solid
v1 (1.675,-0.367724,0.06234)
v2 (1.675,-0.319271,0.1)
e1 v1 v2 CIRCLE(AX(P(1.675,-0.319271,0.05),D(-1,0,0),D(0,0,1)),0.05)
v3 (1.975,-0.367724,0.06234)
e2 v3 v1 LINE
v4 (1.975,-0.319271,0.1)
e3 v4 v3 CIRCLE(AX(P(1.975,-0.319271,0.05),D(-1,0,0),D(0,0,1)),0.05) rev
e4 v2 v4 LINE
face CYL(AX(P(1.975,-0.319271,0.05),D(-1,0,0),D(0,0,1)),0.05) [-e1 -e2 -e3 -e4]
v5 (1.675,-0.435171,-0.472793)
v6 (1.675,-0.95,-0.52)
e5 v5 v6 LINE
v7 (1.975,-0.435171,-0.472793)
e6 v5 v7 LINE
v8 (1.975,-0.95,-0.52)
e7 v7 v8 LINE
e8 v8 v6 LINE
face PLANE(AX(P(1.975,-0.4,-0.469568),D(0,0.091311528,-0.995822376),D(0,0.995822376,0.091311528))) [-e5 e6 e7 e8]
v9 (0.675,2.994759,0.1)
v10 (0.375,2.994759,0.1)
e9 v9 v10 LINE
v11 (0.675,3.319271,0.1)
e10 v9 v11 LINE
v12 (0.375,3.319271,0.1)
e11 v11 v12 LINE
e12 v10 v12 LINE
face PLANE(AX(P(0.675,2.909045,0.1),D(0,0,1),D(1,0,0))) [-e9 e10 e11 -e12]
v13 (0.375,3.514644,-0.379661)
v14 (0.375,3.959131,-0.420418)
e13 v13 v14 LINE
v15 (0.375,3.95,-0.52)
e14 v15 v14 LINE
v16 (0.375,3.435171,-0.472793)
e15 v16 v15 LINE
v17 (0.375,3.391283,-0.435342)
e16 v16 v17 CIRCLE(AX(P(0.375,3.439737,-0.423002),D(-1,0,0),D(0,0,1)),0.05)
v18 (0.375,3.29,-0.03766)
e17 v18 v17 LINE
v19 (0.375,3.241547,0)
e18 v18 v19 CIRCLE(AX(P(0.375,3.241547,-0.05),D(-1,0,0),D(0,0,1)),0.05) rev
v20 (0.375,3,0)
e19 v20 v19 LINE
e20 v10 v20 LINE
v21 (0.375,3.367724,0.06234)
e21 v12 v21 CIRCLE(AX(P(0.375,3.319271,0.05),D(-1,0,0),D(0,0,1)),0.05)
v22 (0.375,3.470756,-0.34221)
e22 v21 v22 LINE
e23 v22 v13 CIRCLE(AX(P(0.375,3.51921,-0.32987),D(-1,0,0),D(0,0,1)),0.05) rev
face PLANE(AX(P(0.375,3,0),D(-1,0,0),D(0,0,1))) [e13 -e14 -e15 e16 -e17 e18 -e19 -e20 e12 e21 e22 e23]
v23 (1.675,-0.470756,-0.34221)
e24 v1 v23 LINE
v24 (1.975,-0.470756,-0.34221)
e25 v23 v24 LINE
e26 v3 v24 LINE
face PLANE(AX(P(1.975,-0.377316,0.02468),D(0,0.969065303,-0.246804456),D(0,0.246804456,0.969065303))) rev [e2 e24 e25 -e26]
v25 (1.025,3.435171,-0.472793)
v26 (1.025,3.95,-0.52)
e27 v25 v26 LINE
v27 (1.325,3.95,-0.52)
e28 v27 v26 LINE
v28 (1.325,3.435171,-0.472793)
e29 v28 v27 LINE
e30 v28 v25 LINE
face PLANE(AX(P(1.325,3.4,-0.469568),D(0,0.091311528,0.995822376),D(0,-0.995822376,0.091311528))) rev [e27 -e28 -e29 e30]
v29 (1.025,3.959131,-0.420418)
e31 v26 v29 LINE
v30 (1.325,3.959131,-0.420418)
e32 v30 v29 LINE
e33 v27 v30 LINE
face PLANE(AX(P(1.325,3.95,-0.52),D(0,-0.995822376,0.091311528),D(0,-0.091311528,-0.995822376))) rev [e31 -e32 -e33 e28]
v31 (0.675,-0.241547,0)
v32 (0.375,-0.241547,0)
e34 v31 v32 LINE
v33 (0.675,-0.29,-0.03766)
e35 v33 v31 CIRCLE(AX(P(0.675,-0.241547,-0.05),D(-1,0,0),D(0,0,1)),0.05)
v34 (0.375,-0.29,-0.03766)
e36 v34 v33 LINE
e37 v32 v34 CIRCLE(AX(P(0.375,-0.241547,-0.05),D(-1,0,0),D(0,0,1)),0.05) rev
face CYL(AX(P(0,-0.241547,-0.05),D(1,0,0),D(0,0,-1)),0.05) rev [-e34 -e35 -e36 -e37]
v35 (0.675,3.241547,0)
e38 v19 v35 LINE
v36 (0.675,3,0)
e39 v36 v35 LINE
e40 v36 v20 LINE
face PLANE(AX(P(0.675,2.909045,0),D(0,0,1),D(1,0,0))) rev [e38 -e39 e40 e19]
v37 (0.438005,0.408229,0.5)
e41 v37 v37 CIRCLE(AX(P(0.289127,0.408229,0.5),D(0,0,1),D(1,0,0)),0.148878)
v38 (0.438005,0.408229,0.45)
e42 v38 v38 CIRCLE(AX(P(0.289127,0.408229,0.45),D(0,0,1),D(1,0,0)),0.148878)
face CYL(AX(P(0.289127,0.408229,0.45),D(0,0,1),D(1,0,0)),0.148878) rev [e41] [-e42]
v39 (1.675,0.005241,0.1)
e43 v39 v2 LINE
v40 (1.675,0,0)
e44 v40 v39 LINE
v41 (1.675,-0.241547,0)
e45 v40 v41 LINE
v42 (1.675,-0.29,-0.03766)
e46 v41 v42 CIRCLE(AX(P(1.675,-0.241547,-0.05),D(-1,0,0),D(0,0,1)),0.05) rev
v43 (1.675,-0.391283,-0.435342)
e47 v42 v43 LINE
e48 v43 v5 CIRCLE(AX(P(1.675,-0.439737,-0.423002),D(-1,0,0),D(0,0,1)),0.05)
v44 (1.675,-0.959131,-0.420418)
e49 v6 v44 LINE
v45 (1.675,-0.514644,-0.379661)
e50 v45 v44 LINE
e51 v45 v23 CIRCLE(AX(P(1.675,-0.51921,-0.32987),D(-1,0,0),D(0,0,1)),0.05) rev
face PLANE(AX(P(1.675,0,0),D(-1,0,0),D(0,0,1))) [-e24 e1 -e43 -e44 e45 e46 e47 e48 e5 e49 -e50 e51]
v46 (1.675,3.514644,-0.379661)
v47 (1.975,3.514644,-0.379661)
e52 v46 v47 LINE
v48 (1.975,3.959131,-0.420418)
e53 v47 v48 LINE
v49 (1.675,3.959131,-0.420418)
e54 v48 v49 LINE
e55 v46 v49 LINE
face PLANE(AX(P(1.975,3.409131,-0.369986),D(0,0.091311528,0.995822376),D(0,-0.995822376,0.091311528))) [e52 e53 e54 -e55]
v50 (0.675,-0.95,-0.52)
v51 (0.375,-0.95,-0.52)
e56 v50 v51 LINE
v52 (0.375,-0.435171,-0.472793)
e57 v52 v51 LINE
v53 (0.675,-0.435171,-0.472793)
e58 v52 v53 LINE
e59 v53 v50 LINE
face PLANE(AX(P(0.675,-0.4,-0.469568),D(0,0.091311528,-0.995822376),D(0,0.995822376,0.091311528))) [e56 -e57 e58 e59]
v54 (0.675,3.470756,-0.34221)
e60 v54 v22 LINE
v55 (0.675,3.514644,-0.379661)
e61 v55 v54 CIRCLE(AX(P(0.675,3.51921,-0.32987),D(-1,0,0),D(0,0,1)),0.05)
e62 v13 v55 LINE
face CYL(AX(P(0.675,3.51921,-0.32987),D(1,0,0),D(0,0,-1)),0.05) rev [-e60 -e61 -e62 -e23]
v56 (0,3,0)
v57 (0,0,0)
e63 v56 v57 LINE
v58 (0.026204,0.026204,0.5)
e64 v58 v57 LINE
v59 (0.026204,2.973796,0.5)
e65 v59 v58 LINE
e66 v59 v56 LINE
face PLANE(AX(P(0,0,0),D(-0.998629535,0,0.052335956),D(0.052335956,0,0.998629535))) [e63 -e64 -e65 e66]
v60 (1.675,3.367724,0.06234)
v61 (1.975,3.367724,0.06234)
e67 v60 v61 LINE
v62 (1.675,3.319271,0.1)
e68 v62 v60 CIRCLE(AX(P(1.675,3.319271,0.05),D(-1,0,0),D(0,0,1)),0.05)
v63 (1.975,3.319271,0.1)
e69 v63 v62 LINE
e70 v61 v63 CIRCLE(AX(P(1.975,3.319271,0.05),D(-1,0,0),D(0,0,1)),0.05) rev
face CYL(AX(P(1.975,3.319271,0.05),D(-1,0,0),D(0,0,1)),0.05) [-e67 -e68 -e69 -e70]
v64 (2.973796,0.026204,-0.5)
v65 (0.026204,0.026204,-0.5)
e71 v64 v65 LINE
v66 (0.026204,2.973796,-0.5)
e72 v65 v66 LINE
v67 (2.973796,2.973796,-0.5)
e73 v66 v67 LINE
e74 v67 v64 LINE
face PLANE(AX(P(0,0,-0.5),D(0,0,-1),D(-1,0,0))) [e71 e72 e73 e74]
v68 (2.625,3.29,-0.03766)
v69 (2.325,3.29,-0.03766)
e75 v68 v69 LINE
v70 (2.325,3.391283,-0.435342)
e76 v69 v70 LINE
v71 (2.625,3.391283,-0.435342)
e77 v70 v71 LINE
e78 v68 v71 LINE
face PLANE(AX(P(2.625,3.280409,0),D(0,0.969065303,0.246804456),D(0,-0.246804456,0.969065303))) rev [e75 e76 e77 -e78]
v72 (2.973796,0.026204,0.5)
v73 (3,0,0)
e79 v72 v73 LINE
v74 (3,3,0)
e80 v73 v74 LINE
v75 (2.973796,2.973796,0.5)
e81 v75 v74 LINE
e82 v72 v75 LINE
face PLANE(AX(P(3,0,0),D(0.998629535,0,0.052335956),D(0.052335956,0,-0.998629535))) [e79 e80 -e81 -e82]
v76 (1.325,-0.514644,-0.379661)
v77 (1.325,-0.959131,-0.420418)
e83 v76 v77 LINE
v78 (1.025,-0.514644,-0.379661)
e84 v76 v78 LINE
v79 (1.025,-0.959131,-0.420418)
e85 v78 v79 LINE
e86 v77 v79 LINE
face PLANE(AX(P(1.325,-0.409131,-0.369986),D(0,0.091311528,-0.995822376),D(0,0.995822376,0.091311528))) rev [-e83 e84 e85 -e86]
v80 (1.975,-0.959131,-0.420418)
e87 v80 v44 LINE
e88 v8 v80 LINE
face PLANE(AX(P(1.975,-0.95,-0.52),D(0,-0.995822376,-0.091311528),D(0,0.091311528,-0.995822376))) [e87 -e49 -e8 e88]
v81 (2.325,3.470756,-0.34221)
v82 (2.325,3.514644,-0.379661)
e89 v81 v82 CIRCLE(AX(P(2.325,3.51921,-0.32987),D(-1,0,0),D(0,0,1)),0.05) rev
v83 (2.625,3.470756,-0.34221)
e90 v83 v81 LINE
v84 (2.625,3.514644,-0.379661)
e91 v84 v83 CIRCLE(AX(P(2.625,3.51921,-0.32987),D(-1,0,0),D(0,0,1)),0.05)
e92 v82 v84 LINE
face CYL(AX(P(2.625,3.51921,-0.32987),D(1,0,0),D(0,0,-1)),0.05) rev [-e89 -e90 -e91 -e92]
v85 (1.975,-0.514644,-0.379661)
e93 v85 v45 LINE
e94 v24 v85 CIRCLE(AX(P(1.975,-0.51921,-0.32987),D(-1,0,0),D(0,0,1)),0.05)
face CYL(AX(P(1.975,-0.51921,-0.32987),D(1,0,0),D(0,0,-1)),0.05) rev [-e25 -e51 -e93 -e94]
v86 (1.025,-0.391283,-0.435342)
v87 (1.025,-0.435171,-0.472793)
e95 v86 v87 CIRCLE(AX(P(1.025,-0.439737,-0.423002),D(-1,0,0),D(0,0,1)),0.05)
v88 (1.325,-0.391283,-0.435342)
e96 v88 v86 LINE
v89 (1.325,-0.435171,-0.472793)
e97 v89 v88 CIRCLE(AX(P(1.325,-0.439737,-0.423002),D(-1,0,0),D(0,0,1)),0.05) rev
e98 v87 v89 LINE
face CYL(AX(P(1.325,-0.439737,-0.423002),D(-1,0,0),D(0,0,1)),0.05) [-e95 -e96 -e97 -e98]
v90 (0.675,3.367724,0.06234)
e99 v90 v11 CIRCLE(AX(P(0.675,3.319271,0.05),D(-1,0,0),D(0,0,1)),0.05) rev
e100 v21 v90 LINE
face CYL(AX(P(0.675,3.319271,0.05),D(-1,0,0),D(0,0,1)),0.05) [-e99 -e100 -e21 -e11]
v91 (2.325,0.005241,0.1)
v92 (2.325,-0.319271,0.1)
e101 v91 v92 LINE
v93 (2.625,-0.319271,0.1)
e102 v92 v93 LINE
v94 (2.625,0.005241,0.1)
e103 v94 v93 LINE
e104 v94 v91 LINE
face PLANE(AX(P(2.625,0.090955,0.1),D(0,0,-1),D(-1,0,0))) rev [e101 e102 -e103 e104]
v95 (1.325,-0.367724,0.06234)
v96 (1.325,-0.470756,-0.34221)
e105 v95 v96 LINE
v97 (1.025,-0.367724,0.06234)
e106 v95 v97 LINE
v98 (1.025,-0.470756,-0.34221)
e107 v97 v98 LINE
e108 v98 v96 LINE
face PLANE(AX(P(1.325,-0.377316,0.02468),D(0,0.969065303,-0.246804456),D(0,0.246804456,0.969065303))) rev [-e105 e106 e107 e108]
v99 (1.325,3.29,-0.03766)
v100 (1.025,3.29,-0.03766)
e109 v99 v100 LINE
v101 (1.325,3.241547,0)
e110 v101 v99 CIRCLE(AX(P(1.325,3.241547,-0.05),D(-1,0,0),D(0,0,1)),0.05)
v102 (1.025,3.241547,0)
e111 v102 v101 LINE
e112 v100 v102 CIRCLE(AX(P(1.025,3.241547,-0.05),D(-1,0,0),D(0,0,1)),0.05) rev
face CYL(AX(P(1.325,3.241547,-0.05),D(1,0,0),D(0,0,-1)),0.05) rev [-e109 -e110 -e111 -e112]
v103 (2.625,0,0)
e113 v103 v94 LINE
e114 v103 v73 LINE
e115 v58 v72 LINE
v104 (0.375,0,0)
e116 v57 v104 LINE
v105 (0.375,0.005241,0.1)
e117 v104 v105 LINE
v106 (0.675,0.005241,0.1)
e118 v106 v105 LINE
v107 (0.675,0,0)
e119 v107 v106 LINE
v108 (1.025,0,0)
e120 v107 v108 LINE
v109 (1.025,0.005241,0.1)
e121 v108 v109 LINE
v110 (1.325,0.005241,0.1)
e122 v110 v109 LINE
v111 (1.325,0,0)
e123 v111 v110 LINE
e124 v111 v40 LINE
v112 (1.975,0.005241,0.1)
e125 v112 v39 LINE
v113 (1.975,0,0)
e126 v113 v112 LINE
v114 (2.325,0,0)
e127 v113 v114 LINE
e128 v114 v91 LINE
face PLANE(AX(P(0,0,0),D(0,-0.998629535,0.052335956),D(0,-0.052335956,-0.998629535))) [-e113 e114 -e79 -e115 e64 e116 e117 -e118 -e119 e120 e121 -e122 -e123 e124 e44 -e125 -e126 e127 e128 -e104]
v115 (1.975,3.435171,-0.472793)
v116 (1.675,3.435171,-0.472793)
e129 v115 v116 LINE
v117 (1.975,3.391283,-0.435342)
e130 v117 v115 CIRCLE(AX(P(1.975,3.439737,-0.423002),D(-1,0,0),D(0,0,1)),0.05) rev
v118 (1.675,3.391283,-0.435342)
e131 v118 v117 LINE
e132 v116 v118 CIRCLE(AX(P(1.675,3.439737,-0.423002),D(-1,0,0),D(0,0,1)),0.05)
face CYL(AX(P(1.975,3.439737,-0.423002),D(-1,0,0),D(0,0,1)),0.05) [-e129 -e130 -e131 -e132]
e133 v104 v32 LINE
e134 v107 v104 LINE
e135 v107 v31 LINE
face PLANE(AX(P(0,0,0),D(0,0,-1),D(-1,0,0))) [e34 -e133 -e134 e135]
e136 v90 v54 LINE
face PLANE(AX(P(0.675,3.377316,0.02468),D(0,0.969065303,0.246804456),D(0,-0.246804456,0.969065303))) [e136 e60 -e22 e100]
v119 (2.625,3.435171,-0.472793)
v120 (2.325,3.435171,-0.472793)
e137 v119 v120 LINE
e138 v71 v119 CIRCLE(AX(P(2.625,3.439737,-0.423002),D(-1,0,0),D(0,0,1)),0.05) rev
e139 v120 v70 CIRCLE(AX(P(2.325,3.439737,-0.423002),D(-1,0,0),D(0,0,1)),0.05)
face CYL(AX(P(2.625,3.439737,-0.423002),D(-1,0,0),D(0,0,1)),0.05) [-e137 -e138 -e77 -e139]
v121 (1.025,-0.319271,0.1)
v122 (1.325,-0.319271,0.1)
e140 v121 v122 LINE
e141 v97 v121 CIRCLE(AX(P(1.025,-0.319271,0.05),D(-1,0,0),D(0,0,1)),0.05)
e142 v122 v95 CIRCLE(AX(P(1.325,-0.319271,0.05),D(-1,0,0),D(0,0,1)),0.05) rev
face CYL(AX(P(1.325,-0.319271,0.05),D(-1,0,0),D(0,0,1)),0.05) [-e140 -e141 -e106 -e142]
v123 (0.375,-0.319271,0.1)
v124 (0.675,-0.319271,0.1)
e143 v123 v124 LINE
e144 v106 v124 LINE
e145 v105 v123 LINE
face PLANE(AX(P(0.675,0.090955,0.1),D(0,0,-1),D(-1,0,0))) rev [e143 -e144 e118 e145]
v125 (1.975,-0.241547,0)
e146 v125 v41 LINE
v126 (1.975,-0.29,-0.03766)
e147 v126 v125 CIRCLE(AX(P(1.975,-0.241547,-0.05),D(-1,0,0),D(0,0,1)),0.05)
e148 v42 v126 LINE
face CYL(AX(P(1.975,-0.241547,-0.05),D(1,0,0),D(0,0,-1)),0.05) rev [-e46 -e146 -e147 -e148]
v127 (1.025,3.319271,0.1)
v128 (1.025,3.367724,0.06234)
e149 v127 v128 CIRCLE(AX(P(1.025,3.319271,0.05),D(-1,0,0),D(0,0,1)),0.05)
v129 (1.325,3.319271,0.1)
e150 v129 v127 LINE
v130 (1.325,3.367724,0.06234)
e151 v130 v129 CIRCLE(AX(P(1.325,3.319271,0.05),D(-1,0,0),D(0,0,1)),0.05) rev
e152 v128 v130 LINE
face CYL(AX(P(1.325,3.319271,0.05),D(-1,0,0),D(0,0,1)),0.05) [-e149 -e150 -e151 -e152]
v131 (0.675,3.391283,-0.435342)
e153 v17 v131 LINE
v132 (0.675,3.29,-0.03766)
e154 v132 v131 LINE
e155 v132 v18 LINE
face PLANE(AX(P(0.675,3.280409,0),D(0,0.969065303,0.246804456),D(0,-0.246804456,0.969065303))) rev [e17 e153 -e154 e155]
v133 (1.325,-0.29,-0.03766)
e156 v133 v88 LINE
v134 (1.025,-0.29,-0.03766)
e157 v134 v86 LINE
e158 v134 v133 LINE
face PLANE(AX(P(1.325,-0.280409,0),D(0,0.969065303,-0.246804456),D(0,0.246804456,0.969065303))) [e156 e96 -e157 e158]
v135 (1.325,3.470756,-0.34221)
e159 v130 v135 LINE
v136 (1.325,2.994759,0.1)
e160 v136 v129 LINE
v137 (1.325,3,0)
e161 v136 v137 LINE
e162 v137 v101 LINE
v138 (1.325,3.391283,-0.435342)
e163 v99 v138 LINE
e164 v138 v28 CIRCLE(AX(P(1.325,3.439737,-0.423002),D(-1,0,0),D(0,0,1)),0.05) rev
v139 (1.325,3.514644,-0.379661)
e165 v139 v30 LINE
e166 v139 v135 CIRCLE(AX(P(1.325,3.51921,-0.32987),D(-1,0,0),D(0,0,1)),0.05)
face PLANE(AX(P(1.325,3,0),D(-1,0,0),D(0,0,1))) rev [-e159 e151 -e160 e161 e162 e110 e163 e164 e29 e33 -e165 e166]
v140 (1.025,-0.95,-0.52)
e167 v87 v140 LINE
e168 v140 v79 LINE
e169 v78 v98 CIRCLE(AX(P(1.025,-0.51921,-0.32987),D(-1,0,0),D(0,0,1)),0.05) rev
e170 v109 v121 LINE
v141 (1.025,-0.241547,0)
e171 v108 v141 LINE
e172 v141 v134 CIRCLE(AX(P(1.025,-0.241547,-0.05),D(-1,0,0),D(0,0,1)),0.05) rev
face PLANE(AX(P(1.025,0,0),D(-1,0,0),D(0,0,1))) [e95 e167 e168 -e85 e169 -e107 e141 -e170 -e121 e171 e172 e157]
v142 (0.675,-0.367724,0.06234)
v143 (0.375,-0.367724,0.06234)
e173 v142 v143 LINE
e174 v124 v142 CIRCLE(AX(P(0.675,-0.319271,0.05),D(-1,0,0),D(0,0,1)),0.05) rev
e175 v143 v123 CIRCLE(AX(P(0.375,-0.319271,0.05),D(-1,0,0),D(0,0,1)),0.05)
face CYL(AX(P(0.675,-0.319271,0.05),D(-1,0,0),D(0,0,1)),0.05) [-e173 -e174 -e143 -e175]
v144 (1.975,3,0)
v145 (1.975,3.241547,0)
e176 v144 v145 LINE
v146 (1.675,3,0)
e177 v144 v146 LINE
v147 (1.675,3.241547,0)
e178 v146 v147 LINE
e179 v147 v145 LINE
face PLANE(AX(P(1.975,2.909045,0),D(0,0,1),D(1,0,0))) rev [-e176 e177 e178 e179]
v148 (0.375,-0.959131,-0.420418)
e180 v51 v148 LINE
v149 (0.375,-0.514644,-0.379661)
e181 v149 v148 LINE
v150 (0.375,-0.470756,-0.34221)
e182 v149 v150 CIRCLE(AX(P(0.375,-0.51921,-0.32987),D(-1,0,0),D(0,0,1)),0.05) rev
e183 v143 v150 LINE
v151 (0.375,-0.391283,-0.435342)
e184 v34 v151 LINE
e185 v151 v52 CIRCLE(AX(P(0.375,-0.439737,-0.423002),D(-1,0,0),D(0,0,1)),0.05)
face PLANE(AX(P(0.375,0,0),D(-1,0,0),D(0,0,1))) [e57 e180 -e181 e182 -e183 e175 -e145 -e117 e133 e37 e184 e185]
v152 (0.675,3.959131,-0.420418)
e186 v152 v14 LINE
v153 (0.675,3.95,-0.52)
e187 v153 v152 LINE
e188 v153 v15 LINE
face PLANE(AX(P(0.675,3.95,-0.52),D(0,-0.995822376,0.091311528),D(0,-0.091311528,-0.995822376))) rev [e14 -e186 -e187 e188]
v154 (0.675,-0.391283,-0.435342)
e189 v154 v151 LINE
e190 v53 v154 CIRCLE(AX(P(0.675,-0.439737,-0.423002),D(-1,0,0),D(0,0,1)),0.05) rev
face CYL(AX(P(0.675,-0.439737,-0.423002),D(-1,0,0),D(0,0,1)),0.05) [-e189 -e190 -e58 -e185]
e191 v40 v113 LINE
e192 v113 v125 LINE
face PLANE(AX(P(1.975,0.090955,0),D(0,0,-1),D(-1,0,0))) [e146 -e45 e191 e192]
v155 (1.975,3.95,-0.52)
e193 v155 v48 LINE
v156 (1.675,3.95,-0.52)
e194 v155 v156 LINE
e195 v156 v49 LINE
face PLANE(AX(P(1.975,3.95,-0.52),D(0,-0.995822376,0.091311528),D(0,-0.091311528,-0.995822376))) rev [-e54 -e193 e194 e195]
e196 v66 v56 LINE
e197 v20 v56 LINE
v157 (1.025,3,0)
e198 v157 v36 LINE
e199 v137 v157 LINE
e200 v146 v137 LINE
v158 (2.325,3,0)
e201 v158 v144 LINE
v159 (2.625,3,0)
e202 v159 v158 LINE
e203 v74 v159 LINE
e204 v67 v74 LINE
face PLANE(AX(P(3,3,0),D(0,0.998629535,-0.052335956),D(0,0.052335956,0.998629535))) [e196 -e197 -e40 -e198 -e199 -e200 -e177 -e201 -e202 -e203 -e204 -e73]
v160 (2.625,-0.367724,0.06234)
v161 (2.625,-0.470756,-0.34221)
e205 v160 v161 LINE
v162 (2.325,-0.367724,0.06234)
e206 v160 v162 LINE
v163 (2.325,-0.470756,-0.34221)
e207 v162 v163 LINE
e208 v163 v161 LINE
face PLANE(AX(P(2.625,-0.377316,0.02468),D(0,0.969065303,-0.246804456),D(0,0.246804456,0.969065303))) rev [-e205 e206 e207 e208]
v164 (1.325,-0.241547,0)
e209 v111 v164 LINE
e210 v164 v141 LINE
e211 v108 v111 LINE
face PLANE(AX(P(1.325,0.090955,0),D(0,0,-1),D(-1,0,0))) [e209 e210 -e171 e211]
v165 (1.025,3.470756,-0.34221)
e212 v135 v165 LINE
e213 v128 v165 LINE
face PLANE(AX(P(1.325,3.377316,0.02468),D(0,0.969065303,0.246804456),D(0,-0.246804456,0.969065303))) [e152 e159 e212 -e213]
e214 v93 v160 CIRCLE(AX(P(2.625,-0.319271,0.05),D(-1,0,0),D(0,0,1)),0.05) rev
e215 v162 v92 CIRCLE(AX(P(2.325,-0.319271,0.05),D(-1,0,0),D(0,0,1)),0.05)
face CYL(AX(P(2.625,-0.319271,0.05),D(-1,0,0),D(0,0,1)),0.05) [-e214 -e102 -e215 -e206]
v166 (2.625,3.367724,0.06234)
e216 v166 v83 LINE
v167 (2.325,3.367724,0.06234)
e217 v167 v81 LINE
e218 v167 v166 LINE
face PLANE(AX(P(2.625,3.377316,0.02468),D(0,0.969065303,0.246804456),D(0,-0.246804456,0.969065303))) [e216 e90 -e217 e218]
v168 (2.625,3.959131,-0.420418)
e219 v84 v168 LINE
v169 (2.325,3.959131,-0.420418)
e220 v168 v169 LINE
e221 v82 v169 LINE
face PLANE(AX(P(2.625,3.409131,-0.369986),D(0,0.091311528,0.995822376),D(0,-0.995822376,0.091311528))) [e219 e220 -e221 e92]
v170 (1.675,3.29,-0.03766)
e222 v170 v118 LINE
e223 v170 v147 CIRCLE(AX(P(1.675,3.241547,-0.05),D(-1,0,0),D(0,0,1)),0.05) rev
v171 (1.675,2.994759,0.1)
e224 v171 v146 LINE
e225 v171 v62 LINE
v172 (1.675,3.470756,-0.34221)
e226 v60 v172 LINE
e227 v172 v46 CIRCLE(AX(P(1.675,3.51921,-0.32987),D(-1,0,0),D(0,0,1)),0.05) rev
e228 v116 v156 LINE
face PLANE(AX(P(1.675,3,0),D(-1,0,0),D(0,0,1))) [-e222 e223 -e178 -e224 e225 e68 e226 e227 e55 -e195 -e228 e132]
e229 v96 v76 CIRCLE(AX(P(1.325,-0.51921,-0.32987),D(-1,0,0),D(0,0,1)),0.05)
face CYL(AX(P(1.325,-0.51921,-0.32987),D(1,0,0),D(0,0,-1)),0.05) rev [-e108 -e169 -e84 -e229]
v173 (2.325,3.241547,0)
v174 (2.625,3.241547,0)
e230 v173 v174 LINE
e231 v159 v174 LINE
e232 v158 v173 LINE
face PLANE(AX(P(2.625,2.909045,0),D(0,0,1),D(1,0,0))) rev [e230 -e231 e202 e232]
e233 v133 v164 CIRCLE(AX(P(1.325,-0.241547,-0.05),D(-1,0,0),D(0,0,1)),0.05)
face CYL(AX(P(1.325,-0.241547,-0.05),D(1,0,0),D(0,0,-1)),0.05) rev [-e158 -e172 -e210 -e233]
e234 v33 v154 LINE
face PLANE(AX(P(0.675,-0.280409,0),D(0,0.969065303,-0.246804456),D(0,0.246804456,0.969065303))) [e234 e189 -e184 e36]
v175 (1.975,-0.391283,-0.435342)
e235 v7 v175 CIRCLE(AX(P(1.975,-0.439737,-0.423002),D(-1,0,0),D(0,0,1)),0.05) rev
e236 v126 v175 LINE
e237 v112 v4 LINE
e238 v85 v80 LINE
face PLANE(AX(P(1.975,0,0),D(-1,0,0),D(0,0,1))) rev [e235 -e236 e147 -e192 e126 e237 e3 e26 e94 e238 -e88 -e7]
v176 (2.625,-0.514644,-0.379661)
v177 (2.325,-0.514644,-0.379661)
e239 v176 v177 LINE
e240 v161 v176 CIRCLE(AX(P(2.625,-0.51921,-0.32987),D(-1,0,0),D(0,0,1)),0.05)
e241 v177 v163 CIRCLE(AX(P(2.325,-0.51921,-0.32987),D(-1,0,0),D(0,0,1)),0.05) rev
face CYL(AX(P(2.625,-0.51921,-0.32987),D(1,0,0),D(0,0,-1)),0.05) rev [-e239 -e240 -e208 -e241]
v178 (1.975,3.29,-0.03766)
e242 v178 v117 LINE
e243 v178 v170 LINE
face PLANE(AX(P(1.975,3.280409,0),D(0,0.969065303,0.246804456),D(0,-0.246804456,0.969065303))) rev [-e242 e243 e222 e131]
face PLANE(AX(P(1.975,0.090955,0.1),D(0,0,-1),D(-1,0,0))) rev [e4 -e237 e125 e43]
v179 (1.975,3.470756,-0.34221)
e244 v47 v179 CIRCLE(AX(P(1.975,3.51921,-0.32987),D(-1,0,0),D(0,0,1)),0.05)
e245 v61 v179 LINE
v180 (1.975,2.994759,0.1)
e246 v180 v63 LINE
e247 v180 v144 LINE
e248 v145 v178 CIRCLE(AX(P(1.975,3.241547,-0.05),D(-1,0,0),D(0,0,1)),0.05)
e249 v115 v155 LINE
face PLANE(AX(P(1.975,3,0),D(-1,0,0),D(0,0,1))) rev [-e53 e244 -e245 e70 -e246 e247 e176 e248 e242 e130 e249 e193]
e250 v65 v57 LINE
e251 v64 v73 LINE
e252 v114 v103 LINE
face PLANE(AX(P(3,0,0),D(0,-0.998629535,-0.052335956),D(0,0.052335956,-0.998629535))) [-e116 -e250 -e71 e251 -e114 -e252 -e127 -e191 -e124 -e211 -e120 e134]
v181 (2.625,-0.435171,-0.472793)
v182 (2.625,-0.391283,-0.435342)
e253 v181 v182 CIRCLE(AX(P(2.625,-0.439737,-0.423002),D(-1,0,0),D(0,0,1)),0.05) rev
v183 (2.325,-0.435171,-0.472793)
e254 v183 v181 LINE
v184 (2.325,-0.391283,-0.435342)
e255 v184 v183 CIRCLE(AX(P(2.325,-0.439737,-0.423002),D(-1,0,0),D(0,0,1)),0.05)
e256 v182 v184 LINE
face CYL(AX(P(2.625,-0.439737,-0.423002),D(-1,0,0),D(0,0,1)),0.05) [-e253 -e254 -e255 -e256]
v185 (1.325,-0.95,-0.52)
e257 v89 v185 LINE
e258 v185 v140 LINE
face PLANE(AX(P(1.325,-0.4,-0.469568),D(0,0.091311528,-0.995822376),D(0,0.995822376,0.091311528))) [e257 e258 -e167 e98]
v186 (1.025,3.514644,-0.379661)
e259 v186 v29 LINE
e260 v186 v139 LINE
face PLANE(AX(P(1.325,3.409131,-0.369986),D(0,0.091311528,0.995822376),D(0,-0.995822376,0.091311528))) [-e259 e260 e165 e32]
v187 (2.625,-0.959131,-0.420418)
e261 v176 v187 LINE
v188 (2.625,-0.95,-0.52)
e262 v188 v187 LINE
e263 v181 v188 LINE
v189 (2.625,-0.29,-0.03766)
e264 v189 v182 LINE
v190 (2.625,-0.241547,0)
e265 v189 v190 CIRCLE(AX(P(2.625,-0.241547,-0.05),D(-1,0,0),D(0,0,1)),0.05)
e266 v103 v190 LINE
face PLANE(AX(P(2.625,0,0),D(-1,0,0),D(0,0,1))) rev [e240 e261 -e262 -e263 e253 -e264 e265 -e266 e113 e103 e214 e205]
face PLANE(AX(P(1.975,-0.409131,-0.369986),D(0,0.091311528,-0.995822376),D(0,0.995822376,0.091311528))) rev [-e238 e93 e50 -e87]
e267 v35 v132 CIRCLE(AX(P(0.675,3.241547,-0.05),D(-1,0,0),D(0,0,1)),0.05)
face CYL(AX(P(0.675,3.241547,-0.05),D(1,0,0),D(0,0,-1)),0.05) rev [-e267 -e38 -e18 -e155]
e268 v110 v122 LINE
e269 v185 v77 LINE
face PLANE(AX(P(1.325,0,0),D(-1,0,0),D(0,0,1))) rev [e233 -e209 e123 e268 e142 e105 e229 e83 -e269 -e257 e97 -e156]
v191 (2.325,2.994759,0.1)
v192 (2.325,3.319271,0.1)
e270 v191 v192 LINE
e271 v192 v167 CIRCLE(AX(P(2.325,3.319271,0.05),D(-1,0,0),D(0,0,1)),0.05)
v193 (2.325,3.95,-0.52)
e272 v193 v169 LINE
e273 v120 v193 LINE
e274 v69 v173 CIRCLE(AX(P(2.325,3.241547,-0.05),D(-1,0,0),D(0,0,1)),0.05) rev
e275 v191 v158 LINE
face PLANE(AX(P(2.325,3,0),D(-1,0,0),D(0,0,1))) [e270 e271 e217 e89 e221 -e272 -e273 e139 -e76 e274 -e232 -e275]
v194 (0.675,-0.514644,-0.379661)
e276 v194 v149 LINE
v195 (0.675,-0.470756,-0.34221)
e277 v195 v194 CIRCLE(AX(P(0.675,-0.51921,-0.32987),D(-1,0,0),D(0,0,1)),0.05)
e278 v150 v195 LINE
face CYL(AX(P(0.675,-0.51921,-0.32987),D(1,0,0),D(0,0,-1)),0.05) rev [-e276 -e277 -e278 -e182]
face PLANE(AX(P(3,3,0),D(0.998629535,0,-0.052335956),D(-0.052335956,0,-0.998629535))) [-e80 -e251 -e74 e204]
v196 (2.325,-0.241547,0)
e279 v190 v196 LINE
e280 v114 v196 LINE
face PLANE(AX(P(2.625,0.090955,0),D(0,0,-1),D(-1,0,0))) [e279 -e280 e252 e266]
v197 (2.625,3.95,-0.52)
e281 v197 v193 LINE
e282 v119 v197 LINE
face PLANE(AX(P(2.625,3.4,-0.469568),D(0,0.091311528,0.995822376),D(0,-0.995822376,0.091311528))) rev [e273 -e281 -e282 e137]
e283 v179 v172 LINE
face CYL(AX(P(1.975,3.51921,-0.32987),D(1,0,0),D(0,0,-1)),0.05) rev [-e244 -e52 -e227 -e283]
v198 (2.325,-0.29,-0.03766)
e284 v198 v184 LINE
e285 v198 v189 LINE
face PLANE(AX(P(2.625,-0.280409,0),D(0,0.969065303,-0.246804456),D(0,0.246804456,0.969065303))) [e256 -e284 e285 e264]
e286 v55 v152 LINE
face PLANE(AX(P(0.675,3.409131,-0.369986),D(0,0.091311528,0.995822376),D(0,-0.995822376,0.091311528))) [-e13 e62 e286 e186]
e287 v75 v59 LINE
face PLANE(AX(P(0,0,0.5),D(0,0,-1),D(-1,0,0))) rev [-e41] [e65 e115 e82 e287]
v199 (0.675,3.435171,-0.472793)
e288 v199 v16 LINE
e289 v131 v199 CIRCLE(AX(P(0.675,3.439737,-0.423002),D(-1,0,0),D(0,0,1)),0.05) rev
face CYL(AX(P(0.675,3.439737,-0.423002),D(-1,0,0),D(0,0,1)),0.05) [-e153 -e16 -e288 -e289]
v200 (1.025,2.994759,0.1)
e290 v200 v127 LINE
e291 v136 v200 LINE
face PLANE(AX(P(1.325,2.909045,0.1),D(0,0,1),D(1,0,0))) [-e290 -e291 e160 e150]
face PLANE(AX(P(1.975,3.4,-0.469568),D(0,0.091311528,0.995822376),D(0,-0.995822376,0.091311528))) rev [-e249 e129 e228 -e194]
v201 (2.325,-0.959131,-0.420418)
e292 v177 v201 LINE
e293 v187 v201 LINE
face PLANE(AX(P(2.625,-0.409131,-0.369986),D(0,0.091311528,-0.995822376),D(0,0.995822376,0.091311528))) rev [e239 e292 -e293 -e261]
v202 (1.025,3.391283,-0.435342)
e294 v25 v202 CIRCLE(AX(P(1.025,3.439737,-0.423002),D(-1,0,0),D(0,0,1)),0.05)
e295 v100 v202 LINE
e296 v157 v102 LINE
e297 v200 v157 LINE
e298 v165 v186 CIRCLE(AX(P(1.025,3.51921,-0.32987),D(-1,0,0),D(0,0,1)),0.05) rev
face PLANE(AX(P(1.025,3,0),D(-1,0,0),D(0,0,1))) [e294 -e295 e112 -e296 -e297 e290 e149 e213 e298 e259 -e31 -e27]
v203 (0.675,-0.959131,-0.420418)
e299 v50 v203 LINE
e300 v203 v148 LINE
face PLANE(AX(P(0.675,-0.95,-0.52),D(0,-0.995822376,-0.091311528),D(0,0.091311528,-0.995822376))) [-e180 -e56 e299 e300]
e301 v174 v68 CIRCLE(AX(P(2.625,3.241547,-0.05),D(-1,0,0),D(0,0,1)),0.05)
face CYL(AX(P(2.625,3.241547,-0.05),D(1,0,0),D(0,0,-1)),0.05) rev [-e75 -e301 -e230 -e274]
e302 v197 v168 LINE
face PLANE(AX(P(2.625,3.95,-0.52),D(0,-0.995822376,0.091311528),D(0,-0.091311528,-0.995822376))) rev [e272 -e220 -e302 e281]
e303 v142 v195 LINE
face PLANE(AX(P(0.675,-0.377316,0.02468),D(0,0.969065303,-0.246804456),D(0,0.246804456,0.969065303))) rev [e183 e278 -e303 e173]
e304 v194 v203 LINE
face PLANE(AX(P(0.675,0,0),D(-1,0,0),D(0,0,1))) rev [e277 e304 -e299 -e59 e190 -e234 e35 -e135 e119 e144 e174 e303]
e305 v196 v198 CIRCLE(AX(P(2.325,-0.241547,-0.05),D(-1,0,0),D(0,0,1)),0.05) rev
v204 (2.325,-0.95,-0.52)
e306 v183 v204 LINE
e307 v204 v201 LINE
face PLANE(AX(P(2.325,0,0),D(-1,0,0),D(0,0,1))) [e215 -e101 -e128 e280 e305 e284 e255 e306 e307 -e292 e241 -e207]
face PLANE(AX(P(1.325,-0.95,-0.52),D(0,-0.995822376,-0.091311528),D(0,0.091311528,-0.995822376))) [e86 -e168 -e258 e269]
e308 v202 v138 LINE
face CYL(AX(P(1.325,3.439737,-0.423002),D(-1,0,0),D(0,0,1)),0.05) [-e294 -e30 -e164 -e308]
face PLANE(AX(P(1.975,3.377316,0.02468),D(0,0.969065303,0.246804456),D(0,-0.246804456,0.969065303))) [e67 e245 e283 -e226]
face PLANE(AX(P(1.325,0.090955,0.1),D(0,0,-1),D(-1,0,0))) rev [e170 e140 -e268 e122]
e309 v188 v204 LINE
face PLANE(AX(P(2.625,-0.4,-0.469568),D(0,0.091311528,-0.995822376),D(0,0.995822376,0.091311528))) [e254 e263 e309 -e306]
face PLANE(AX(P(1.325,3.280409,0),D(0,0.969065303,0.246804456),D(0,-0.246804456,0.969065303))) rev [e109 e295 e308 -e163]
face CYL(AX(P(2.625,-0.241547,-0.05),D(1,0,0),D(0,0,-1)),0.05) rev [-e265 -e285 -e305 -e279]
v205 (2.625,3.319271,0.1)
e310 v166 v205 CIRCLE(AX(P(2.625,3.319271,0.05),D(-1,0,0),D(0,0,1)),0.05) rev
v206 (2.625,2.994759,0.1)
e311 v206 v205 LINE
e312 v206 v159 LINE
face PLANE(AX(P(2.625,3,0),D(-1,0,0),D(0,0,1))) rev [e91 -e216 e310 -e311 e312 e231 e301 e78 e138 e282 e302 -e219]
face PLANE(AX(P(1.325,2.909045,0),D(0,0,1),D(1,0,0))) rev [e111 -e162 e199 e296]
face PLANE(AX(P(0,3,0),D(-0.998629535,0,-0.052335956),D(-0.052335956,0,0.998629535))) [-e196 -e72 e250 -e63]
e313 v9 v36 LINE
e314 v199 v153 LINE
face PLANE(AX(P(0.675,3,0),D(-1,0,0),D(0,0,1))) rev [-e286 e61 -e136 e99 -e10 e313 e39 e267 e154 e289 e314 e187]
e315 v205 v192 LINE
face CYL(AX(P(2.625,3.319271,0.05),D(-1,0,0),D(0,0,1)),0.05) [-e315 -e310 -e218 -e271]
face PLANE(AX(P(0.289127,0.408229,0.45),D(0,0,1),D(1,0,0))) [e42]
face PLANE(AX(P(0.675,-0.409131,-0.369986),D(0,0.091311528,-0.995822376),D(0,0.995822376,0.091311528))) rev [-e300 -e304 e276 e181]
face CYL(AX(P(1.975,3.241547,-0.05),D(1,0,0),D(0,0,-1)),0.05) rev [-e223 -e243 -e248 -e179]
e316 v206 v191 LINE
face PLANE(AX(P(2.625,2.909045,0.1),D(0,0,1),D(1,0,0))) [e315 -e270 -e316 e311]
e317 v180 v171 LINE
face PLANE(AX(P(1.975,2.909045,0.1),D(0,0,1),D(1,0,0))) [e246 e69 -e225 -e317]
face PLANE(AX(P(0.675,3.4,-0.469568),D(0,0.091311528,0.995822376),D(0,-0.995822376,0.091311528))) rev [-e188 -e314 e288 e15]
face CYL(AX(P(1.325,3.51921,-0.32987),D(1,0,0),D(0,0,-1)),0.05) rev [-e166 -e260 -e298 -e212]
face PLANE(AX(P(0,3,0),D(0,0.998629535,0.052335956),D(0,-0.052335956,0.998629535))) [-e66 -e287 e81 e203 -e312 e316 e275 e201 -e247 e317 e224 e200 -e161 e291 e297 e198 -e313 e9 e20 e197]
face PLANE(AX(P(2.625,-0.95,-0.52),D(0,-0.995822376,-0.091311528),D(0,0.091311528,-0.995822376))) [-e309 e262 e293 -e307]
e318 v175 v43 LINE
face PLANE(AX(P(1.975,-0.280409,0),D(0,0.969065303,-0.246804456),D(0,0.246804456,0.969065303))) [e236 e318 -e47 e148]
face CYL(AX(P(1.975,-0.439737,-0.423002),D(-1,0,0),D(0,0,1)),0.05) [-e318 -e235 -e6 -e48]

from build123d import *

# Parameters (mm, degrees)
SKETCH1_W              = 3
SKETCH1_H              = 3
BOSS_EXTRUDE1_DEPTH    = 0.5
BOSS_EXTRUDE1_TAPER    = 3
SKETCH2_W              = 3
SKETCH2_H              = 3
BOSS_EXTRUDE2_DEPTH    = 0.5
BOSS_EXTRUDE2_TAPER    = 3
EXTRUDE_THIN1_DEPTH    = 0.15
FILLET1_R              = 0.05
LPATTERN1_COUNT        = 4
LPATTERN1_PITCH        = 0.65
FILLET1_OF_LPATTERN1_R = 0.05
MIRROR1_START          = 0.375
MIRROR1_DEPTH          = 0.3
MIRROR1_START_2        = 1.025
MIRROR1_2_DEPTH        = 0.3
MIRROR1_START_3        = 1.675
MIRROR1_3_DEPTH        = 0.3
MIRROR1_START_4        = 2.325
MIRROR1_4_DEPTH        = 0.3
SKETCH4_R              = 0.14887785
CUT_EXTRUDE1_DEPTH     = 0.05


# Read off the part's stored shape, not the designer's step: Mirror1
with BuildPart() as part:
    # Sketch1 → Boss-Extrude1 (new body)
    with BuildSketch(Plane.XY):
        with Locations((1.5, 1.5)):
            Rectangle(SKETCH1_W, SKETCH1_H)
    extrude(amount=BOSS_EXTRUDE1_DEPTH, taper=BOSS_EXTRUDE1_TAPER)



with BuildPart() as body_2:
    # Sketch2 → Boss-Extrude2 (new body)
    with BuildSketch(Plane(origin=(0, 0, 0), x_dir=(-1, 0, 0), z_dir=(0, 0, -1))):
        with Locations((-1.5, 1.5)):
            Rectangle(SKETCH2_W, SKETCH2_H)
    extrude(amount=BOSS_EXTRUDE2_DEPTH, taper=BOSS_EXTRUDE2_TAPER)


with BuildPart() as part_1:
    add(part.part)

    add(body_2.part)  # Extrude-Thin1 merges body 2
    # Sketch3 → Extrude-Thin1 (add, symmetric)
    with BuildSketch(Plane(origin=(0.525, 0, 0), x_dir=(0, 0, -1), z_dir=(1, 0, 0))):
        Polygon((0, 0.090955067), (0, -0.280409021), (0.469567974, -0.4), (0.52, -0.95), (0.420417762, -0.959131153), (0.376435704, -0.479473015), (-0.1, -0.358132942), (-0.1, 0.090955067), align=None)
    extrude_thin1 = extrude(amount=EXTRUDE_THIN1_DEPTH, both=True)

    # Fillet1
    fillet1_edges = [part_1.edges().sort_by_distance(p)[0] for p in [
        (0.525, -0.280409021, 0),
        (0.525, -0.479473015, -0.376435704),
        (0.525, -0.4, -0.469567974),
        (0.525, -0.358132942, 0.1),
    ]]
    fillet(fillet1_edges, radius=FILLET1_R)

    # LPattern1: Extrude-Thin1 ×4
    with Locations(*[(i * LPATTERN1_PITCH, 0, 0) for i in range(1, LPATTERN1_COUNT)]):
        add(extrude_thin1)

    # Fillet1 of LPattern1
    fillet1_of_lpattern1_edges = [part_1.edges().sort_by_distance(p)[0] for p in [
        (1.175, -0.280409021, 0),
        (1.175, -0.479473015, -0.376435704),
        (1.175, -0.4, -0.469567974),
        (1.175, -0.358132942, 0.1),
        (1.825, -0.280409021, 0),
        (1.825, -0.479473015, -0.376435704),
        (1.825, -0.4, -0.469567974),
        (1.825, -0.358132942, 0.1),
        (2.475, -0.280409021, 0),
        (2.475, -0.479473015, -0.376435704),
        (2.475, -0.4, -0.469567974),
        (2.475, -0.358132942, 0.1),
    ]]
    fillet(fillet1_of_lpattern1_edges, radius=FILLET1_OF_LPATTERN1_R)

    # Mirror1 outline → Mirror1 (add)
    with BuildSketch(Plane.YZ.offset(MIRROR1_START)):
        with BuildLine():
            Line((3, 0), (3.241547061, 0))
            ThreePointArc((3.241547061, 0), (3.272230842, -0.010522088), (3.290000326, -0.037659777))
            Line((3.290000326, -0.037659777), (3.391283242, -0.435342062))
            ThreePointArc((3.391283242, -0.435342062), (3.40728051, -0.461036142), (3.435170931, -0.472792958))
            Line((3.435170931, -0.472792958), (3.95, -0.52))
            Line((3.95, -0.52), (3.959131153, -0.420417762))
            Line((3.959131153, -0.420417762), (3.514643946, -0.379660689))
            ThreePointArc((3.514643946, -0.379660689), (3.486753524, -0.367903873), (3.470756257, -0.342209793))
            Line((3.470756257, -0.342209793), (3.367724246, 0.062340223))
            ThreePointArc((3.367724246, 0.062340223), (3.349954762, 0.089477913), (3.319270981, 0.1))
            Line((3.319270981, 0.1), (2.994759222, 0.1))
            Line((2.994759222, 0.1), (3, 0))
        make_face()
    extrude(amount=MIRROR1_DEPTH)

    # Mirror1 2 outline → Mirror1 2 (add)
    with BuildSketch(Plane.YZ.offset(MIRROR1_START_2)):
        with BuildLine():
            Line((3, 0), (3.241547061, 0))
            ThreePointArc((3.241547061, 0), (3.272230842, -0.010522088), (3.290000326, -0.037659777))
            Line((3.290000326, -0.037659777), (3.391283242, -0.435342062))
            ThreePointArc((3.391283242, -0.435342062), (3.40728051, -0.461036142), (3.435170931, -0.472792958))
            Line((3.435170931, -0.472792958), (3.95, -0.52))
            Line((3.95, -0.52), (3.959131153, -0.420417762))
            Line((3.959131153, -0.420417762), (3.514643946, -0.379660689))
            ThreePointArc((3.514643946, -0.379660689), (3.486753524, -0.367903873), (3.470756257, -0.342209793))
            Line((3.470756257, -0.342209793), (3.367724246, 0.062340223))
            ThreePointArc((3.367724246, 0.062340223), (3.349954762, 0.089477913), (3.319270981, 0.1))
            Line((3.319270981, 0.1), (2.994759222, 0.1))
            Line((2.994759222, 0.1), (3, 0))
        make_face()
    extrude(amount=MIRROR1_2_DEPTH)

    # Mirror1 3 outline → Mirror1 3 (add)
    with BuildSketch(Plane.YZ.offset(MIRROR1_START_3)):
        with BuildLine():
            Line((3, 0), (3.241547061, 0))
            ThreePointArc((3.241547061, 0), (3.272230842, -0.010522088), (3.290000326, -0.037659777))
            Line((3.290000326, -0.037659777), (3.391283242, -0.435342062))
            ThreePointArc((3.391283242, -0.435342062), (3.40728051, -0.461036142), (3.435170931, -0.472792958))
            Line((3.435170931, -0.472792958), (3.95, -0.52))
            Line((3.95, -0.52), (3.959131153, -0.420417762))
            Line((3.959131153, -0.420417762), (3.514643946, -0.379660689))
            ThreePointArc((3.514643946, -0.379660689), (3.486753524, -0.367903873), (3.470756257, -0.342209793))
            Line((3.470756257, -0.342209793), (3.367724246, 0.062340223))
            ThreePointArc((3.367724246, 0.062340223), (3.349954762, 0.089477913), (3.319270981, 0.1))
            Line((3.319270981, 0.1), (2.994759222, 0.1))
            Line((2.994759222, 0.1), (3, 0))
        make_face()
    extrude(amount=MIRROR1_3_DEPTH)

    # Mirror1 4 outline → Mirror1 4 (add)
    with BuildSketch(Plane.YZ.offset(MIRROR1_START_4)):
        with BuildLine():
            Line((3, 0), (3.241547061, 0))
            ThreePointArc((3.241547061, 0), (3.272230842, -0.010522088), (3.290000326, -0.037659777))
            Line((3.290000326, -0.037659777), (3.391283242, -0.435342062))
            ThreePointArc((3.391283242, -0.435342062), (3.40728051, -0.461036142), (3.435170931, -0.472792958))
            Line((3.435170931, -0.472792958), (3.95, -0.52))
            Line((3.95, -0.52), (3.959131153, -0.420417762))
            Line((3.959131153, -0.420417762), (3.514643946, -0.379660689))
            ThreePointArc((3.514643946, -0.379660689), (3.486753524, -0.367903873), (3.470756257, -0.342209793))
            Line((3.470756257, -0.342209793), (3.367724246, 0.062340223))
            ThreePointArc((3.367724246, 0.062340223), (3.349954762, 0.089477913), (3.319270981, 0.1))
            Line((3.319270981, 0.1), (2.994759222, 0.1))
            Line((2.994759222, 0.1), (3, 0))
        make_face()
    extrude(amount=MIRROR1_4_DEPTH)

    # Sketch4 → Cut-Extrude1 (cut)
    with BuildSketch(Plane.XY.offset(0.5)):
        with Locations((0.289126817, 0.408229097)):
            Circle(SKETCH4_R)
    extrude(amount=-CUT_EXTRUDE1_DEPTH, mode=Mode.SUBTRACT)


solid = part_1.part
